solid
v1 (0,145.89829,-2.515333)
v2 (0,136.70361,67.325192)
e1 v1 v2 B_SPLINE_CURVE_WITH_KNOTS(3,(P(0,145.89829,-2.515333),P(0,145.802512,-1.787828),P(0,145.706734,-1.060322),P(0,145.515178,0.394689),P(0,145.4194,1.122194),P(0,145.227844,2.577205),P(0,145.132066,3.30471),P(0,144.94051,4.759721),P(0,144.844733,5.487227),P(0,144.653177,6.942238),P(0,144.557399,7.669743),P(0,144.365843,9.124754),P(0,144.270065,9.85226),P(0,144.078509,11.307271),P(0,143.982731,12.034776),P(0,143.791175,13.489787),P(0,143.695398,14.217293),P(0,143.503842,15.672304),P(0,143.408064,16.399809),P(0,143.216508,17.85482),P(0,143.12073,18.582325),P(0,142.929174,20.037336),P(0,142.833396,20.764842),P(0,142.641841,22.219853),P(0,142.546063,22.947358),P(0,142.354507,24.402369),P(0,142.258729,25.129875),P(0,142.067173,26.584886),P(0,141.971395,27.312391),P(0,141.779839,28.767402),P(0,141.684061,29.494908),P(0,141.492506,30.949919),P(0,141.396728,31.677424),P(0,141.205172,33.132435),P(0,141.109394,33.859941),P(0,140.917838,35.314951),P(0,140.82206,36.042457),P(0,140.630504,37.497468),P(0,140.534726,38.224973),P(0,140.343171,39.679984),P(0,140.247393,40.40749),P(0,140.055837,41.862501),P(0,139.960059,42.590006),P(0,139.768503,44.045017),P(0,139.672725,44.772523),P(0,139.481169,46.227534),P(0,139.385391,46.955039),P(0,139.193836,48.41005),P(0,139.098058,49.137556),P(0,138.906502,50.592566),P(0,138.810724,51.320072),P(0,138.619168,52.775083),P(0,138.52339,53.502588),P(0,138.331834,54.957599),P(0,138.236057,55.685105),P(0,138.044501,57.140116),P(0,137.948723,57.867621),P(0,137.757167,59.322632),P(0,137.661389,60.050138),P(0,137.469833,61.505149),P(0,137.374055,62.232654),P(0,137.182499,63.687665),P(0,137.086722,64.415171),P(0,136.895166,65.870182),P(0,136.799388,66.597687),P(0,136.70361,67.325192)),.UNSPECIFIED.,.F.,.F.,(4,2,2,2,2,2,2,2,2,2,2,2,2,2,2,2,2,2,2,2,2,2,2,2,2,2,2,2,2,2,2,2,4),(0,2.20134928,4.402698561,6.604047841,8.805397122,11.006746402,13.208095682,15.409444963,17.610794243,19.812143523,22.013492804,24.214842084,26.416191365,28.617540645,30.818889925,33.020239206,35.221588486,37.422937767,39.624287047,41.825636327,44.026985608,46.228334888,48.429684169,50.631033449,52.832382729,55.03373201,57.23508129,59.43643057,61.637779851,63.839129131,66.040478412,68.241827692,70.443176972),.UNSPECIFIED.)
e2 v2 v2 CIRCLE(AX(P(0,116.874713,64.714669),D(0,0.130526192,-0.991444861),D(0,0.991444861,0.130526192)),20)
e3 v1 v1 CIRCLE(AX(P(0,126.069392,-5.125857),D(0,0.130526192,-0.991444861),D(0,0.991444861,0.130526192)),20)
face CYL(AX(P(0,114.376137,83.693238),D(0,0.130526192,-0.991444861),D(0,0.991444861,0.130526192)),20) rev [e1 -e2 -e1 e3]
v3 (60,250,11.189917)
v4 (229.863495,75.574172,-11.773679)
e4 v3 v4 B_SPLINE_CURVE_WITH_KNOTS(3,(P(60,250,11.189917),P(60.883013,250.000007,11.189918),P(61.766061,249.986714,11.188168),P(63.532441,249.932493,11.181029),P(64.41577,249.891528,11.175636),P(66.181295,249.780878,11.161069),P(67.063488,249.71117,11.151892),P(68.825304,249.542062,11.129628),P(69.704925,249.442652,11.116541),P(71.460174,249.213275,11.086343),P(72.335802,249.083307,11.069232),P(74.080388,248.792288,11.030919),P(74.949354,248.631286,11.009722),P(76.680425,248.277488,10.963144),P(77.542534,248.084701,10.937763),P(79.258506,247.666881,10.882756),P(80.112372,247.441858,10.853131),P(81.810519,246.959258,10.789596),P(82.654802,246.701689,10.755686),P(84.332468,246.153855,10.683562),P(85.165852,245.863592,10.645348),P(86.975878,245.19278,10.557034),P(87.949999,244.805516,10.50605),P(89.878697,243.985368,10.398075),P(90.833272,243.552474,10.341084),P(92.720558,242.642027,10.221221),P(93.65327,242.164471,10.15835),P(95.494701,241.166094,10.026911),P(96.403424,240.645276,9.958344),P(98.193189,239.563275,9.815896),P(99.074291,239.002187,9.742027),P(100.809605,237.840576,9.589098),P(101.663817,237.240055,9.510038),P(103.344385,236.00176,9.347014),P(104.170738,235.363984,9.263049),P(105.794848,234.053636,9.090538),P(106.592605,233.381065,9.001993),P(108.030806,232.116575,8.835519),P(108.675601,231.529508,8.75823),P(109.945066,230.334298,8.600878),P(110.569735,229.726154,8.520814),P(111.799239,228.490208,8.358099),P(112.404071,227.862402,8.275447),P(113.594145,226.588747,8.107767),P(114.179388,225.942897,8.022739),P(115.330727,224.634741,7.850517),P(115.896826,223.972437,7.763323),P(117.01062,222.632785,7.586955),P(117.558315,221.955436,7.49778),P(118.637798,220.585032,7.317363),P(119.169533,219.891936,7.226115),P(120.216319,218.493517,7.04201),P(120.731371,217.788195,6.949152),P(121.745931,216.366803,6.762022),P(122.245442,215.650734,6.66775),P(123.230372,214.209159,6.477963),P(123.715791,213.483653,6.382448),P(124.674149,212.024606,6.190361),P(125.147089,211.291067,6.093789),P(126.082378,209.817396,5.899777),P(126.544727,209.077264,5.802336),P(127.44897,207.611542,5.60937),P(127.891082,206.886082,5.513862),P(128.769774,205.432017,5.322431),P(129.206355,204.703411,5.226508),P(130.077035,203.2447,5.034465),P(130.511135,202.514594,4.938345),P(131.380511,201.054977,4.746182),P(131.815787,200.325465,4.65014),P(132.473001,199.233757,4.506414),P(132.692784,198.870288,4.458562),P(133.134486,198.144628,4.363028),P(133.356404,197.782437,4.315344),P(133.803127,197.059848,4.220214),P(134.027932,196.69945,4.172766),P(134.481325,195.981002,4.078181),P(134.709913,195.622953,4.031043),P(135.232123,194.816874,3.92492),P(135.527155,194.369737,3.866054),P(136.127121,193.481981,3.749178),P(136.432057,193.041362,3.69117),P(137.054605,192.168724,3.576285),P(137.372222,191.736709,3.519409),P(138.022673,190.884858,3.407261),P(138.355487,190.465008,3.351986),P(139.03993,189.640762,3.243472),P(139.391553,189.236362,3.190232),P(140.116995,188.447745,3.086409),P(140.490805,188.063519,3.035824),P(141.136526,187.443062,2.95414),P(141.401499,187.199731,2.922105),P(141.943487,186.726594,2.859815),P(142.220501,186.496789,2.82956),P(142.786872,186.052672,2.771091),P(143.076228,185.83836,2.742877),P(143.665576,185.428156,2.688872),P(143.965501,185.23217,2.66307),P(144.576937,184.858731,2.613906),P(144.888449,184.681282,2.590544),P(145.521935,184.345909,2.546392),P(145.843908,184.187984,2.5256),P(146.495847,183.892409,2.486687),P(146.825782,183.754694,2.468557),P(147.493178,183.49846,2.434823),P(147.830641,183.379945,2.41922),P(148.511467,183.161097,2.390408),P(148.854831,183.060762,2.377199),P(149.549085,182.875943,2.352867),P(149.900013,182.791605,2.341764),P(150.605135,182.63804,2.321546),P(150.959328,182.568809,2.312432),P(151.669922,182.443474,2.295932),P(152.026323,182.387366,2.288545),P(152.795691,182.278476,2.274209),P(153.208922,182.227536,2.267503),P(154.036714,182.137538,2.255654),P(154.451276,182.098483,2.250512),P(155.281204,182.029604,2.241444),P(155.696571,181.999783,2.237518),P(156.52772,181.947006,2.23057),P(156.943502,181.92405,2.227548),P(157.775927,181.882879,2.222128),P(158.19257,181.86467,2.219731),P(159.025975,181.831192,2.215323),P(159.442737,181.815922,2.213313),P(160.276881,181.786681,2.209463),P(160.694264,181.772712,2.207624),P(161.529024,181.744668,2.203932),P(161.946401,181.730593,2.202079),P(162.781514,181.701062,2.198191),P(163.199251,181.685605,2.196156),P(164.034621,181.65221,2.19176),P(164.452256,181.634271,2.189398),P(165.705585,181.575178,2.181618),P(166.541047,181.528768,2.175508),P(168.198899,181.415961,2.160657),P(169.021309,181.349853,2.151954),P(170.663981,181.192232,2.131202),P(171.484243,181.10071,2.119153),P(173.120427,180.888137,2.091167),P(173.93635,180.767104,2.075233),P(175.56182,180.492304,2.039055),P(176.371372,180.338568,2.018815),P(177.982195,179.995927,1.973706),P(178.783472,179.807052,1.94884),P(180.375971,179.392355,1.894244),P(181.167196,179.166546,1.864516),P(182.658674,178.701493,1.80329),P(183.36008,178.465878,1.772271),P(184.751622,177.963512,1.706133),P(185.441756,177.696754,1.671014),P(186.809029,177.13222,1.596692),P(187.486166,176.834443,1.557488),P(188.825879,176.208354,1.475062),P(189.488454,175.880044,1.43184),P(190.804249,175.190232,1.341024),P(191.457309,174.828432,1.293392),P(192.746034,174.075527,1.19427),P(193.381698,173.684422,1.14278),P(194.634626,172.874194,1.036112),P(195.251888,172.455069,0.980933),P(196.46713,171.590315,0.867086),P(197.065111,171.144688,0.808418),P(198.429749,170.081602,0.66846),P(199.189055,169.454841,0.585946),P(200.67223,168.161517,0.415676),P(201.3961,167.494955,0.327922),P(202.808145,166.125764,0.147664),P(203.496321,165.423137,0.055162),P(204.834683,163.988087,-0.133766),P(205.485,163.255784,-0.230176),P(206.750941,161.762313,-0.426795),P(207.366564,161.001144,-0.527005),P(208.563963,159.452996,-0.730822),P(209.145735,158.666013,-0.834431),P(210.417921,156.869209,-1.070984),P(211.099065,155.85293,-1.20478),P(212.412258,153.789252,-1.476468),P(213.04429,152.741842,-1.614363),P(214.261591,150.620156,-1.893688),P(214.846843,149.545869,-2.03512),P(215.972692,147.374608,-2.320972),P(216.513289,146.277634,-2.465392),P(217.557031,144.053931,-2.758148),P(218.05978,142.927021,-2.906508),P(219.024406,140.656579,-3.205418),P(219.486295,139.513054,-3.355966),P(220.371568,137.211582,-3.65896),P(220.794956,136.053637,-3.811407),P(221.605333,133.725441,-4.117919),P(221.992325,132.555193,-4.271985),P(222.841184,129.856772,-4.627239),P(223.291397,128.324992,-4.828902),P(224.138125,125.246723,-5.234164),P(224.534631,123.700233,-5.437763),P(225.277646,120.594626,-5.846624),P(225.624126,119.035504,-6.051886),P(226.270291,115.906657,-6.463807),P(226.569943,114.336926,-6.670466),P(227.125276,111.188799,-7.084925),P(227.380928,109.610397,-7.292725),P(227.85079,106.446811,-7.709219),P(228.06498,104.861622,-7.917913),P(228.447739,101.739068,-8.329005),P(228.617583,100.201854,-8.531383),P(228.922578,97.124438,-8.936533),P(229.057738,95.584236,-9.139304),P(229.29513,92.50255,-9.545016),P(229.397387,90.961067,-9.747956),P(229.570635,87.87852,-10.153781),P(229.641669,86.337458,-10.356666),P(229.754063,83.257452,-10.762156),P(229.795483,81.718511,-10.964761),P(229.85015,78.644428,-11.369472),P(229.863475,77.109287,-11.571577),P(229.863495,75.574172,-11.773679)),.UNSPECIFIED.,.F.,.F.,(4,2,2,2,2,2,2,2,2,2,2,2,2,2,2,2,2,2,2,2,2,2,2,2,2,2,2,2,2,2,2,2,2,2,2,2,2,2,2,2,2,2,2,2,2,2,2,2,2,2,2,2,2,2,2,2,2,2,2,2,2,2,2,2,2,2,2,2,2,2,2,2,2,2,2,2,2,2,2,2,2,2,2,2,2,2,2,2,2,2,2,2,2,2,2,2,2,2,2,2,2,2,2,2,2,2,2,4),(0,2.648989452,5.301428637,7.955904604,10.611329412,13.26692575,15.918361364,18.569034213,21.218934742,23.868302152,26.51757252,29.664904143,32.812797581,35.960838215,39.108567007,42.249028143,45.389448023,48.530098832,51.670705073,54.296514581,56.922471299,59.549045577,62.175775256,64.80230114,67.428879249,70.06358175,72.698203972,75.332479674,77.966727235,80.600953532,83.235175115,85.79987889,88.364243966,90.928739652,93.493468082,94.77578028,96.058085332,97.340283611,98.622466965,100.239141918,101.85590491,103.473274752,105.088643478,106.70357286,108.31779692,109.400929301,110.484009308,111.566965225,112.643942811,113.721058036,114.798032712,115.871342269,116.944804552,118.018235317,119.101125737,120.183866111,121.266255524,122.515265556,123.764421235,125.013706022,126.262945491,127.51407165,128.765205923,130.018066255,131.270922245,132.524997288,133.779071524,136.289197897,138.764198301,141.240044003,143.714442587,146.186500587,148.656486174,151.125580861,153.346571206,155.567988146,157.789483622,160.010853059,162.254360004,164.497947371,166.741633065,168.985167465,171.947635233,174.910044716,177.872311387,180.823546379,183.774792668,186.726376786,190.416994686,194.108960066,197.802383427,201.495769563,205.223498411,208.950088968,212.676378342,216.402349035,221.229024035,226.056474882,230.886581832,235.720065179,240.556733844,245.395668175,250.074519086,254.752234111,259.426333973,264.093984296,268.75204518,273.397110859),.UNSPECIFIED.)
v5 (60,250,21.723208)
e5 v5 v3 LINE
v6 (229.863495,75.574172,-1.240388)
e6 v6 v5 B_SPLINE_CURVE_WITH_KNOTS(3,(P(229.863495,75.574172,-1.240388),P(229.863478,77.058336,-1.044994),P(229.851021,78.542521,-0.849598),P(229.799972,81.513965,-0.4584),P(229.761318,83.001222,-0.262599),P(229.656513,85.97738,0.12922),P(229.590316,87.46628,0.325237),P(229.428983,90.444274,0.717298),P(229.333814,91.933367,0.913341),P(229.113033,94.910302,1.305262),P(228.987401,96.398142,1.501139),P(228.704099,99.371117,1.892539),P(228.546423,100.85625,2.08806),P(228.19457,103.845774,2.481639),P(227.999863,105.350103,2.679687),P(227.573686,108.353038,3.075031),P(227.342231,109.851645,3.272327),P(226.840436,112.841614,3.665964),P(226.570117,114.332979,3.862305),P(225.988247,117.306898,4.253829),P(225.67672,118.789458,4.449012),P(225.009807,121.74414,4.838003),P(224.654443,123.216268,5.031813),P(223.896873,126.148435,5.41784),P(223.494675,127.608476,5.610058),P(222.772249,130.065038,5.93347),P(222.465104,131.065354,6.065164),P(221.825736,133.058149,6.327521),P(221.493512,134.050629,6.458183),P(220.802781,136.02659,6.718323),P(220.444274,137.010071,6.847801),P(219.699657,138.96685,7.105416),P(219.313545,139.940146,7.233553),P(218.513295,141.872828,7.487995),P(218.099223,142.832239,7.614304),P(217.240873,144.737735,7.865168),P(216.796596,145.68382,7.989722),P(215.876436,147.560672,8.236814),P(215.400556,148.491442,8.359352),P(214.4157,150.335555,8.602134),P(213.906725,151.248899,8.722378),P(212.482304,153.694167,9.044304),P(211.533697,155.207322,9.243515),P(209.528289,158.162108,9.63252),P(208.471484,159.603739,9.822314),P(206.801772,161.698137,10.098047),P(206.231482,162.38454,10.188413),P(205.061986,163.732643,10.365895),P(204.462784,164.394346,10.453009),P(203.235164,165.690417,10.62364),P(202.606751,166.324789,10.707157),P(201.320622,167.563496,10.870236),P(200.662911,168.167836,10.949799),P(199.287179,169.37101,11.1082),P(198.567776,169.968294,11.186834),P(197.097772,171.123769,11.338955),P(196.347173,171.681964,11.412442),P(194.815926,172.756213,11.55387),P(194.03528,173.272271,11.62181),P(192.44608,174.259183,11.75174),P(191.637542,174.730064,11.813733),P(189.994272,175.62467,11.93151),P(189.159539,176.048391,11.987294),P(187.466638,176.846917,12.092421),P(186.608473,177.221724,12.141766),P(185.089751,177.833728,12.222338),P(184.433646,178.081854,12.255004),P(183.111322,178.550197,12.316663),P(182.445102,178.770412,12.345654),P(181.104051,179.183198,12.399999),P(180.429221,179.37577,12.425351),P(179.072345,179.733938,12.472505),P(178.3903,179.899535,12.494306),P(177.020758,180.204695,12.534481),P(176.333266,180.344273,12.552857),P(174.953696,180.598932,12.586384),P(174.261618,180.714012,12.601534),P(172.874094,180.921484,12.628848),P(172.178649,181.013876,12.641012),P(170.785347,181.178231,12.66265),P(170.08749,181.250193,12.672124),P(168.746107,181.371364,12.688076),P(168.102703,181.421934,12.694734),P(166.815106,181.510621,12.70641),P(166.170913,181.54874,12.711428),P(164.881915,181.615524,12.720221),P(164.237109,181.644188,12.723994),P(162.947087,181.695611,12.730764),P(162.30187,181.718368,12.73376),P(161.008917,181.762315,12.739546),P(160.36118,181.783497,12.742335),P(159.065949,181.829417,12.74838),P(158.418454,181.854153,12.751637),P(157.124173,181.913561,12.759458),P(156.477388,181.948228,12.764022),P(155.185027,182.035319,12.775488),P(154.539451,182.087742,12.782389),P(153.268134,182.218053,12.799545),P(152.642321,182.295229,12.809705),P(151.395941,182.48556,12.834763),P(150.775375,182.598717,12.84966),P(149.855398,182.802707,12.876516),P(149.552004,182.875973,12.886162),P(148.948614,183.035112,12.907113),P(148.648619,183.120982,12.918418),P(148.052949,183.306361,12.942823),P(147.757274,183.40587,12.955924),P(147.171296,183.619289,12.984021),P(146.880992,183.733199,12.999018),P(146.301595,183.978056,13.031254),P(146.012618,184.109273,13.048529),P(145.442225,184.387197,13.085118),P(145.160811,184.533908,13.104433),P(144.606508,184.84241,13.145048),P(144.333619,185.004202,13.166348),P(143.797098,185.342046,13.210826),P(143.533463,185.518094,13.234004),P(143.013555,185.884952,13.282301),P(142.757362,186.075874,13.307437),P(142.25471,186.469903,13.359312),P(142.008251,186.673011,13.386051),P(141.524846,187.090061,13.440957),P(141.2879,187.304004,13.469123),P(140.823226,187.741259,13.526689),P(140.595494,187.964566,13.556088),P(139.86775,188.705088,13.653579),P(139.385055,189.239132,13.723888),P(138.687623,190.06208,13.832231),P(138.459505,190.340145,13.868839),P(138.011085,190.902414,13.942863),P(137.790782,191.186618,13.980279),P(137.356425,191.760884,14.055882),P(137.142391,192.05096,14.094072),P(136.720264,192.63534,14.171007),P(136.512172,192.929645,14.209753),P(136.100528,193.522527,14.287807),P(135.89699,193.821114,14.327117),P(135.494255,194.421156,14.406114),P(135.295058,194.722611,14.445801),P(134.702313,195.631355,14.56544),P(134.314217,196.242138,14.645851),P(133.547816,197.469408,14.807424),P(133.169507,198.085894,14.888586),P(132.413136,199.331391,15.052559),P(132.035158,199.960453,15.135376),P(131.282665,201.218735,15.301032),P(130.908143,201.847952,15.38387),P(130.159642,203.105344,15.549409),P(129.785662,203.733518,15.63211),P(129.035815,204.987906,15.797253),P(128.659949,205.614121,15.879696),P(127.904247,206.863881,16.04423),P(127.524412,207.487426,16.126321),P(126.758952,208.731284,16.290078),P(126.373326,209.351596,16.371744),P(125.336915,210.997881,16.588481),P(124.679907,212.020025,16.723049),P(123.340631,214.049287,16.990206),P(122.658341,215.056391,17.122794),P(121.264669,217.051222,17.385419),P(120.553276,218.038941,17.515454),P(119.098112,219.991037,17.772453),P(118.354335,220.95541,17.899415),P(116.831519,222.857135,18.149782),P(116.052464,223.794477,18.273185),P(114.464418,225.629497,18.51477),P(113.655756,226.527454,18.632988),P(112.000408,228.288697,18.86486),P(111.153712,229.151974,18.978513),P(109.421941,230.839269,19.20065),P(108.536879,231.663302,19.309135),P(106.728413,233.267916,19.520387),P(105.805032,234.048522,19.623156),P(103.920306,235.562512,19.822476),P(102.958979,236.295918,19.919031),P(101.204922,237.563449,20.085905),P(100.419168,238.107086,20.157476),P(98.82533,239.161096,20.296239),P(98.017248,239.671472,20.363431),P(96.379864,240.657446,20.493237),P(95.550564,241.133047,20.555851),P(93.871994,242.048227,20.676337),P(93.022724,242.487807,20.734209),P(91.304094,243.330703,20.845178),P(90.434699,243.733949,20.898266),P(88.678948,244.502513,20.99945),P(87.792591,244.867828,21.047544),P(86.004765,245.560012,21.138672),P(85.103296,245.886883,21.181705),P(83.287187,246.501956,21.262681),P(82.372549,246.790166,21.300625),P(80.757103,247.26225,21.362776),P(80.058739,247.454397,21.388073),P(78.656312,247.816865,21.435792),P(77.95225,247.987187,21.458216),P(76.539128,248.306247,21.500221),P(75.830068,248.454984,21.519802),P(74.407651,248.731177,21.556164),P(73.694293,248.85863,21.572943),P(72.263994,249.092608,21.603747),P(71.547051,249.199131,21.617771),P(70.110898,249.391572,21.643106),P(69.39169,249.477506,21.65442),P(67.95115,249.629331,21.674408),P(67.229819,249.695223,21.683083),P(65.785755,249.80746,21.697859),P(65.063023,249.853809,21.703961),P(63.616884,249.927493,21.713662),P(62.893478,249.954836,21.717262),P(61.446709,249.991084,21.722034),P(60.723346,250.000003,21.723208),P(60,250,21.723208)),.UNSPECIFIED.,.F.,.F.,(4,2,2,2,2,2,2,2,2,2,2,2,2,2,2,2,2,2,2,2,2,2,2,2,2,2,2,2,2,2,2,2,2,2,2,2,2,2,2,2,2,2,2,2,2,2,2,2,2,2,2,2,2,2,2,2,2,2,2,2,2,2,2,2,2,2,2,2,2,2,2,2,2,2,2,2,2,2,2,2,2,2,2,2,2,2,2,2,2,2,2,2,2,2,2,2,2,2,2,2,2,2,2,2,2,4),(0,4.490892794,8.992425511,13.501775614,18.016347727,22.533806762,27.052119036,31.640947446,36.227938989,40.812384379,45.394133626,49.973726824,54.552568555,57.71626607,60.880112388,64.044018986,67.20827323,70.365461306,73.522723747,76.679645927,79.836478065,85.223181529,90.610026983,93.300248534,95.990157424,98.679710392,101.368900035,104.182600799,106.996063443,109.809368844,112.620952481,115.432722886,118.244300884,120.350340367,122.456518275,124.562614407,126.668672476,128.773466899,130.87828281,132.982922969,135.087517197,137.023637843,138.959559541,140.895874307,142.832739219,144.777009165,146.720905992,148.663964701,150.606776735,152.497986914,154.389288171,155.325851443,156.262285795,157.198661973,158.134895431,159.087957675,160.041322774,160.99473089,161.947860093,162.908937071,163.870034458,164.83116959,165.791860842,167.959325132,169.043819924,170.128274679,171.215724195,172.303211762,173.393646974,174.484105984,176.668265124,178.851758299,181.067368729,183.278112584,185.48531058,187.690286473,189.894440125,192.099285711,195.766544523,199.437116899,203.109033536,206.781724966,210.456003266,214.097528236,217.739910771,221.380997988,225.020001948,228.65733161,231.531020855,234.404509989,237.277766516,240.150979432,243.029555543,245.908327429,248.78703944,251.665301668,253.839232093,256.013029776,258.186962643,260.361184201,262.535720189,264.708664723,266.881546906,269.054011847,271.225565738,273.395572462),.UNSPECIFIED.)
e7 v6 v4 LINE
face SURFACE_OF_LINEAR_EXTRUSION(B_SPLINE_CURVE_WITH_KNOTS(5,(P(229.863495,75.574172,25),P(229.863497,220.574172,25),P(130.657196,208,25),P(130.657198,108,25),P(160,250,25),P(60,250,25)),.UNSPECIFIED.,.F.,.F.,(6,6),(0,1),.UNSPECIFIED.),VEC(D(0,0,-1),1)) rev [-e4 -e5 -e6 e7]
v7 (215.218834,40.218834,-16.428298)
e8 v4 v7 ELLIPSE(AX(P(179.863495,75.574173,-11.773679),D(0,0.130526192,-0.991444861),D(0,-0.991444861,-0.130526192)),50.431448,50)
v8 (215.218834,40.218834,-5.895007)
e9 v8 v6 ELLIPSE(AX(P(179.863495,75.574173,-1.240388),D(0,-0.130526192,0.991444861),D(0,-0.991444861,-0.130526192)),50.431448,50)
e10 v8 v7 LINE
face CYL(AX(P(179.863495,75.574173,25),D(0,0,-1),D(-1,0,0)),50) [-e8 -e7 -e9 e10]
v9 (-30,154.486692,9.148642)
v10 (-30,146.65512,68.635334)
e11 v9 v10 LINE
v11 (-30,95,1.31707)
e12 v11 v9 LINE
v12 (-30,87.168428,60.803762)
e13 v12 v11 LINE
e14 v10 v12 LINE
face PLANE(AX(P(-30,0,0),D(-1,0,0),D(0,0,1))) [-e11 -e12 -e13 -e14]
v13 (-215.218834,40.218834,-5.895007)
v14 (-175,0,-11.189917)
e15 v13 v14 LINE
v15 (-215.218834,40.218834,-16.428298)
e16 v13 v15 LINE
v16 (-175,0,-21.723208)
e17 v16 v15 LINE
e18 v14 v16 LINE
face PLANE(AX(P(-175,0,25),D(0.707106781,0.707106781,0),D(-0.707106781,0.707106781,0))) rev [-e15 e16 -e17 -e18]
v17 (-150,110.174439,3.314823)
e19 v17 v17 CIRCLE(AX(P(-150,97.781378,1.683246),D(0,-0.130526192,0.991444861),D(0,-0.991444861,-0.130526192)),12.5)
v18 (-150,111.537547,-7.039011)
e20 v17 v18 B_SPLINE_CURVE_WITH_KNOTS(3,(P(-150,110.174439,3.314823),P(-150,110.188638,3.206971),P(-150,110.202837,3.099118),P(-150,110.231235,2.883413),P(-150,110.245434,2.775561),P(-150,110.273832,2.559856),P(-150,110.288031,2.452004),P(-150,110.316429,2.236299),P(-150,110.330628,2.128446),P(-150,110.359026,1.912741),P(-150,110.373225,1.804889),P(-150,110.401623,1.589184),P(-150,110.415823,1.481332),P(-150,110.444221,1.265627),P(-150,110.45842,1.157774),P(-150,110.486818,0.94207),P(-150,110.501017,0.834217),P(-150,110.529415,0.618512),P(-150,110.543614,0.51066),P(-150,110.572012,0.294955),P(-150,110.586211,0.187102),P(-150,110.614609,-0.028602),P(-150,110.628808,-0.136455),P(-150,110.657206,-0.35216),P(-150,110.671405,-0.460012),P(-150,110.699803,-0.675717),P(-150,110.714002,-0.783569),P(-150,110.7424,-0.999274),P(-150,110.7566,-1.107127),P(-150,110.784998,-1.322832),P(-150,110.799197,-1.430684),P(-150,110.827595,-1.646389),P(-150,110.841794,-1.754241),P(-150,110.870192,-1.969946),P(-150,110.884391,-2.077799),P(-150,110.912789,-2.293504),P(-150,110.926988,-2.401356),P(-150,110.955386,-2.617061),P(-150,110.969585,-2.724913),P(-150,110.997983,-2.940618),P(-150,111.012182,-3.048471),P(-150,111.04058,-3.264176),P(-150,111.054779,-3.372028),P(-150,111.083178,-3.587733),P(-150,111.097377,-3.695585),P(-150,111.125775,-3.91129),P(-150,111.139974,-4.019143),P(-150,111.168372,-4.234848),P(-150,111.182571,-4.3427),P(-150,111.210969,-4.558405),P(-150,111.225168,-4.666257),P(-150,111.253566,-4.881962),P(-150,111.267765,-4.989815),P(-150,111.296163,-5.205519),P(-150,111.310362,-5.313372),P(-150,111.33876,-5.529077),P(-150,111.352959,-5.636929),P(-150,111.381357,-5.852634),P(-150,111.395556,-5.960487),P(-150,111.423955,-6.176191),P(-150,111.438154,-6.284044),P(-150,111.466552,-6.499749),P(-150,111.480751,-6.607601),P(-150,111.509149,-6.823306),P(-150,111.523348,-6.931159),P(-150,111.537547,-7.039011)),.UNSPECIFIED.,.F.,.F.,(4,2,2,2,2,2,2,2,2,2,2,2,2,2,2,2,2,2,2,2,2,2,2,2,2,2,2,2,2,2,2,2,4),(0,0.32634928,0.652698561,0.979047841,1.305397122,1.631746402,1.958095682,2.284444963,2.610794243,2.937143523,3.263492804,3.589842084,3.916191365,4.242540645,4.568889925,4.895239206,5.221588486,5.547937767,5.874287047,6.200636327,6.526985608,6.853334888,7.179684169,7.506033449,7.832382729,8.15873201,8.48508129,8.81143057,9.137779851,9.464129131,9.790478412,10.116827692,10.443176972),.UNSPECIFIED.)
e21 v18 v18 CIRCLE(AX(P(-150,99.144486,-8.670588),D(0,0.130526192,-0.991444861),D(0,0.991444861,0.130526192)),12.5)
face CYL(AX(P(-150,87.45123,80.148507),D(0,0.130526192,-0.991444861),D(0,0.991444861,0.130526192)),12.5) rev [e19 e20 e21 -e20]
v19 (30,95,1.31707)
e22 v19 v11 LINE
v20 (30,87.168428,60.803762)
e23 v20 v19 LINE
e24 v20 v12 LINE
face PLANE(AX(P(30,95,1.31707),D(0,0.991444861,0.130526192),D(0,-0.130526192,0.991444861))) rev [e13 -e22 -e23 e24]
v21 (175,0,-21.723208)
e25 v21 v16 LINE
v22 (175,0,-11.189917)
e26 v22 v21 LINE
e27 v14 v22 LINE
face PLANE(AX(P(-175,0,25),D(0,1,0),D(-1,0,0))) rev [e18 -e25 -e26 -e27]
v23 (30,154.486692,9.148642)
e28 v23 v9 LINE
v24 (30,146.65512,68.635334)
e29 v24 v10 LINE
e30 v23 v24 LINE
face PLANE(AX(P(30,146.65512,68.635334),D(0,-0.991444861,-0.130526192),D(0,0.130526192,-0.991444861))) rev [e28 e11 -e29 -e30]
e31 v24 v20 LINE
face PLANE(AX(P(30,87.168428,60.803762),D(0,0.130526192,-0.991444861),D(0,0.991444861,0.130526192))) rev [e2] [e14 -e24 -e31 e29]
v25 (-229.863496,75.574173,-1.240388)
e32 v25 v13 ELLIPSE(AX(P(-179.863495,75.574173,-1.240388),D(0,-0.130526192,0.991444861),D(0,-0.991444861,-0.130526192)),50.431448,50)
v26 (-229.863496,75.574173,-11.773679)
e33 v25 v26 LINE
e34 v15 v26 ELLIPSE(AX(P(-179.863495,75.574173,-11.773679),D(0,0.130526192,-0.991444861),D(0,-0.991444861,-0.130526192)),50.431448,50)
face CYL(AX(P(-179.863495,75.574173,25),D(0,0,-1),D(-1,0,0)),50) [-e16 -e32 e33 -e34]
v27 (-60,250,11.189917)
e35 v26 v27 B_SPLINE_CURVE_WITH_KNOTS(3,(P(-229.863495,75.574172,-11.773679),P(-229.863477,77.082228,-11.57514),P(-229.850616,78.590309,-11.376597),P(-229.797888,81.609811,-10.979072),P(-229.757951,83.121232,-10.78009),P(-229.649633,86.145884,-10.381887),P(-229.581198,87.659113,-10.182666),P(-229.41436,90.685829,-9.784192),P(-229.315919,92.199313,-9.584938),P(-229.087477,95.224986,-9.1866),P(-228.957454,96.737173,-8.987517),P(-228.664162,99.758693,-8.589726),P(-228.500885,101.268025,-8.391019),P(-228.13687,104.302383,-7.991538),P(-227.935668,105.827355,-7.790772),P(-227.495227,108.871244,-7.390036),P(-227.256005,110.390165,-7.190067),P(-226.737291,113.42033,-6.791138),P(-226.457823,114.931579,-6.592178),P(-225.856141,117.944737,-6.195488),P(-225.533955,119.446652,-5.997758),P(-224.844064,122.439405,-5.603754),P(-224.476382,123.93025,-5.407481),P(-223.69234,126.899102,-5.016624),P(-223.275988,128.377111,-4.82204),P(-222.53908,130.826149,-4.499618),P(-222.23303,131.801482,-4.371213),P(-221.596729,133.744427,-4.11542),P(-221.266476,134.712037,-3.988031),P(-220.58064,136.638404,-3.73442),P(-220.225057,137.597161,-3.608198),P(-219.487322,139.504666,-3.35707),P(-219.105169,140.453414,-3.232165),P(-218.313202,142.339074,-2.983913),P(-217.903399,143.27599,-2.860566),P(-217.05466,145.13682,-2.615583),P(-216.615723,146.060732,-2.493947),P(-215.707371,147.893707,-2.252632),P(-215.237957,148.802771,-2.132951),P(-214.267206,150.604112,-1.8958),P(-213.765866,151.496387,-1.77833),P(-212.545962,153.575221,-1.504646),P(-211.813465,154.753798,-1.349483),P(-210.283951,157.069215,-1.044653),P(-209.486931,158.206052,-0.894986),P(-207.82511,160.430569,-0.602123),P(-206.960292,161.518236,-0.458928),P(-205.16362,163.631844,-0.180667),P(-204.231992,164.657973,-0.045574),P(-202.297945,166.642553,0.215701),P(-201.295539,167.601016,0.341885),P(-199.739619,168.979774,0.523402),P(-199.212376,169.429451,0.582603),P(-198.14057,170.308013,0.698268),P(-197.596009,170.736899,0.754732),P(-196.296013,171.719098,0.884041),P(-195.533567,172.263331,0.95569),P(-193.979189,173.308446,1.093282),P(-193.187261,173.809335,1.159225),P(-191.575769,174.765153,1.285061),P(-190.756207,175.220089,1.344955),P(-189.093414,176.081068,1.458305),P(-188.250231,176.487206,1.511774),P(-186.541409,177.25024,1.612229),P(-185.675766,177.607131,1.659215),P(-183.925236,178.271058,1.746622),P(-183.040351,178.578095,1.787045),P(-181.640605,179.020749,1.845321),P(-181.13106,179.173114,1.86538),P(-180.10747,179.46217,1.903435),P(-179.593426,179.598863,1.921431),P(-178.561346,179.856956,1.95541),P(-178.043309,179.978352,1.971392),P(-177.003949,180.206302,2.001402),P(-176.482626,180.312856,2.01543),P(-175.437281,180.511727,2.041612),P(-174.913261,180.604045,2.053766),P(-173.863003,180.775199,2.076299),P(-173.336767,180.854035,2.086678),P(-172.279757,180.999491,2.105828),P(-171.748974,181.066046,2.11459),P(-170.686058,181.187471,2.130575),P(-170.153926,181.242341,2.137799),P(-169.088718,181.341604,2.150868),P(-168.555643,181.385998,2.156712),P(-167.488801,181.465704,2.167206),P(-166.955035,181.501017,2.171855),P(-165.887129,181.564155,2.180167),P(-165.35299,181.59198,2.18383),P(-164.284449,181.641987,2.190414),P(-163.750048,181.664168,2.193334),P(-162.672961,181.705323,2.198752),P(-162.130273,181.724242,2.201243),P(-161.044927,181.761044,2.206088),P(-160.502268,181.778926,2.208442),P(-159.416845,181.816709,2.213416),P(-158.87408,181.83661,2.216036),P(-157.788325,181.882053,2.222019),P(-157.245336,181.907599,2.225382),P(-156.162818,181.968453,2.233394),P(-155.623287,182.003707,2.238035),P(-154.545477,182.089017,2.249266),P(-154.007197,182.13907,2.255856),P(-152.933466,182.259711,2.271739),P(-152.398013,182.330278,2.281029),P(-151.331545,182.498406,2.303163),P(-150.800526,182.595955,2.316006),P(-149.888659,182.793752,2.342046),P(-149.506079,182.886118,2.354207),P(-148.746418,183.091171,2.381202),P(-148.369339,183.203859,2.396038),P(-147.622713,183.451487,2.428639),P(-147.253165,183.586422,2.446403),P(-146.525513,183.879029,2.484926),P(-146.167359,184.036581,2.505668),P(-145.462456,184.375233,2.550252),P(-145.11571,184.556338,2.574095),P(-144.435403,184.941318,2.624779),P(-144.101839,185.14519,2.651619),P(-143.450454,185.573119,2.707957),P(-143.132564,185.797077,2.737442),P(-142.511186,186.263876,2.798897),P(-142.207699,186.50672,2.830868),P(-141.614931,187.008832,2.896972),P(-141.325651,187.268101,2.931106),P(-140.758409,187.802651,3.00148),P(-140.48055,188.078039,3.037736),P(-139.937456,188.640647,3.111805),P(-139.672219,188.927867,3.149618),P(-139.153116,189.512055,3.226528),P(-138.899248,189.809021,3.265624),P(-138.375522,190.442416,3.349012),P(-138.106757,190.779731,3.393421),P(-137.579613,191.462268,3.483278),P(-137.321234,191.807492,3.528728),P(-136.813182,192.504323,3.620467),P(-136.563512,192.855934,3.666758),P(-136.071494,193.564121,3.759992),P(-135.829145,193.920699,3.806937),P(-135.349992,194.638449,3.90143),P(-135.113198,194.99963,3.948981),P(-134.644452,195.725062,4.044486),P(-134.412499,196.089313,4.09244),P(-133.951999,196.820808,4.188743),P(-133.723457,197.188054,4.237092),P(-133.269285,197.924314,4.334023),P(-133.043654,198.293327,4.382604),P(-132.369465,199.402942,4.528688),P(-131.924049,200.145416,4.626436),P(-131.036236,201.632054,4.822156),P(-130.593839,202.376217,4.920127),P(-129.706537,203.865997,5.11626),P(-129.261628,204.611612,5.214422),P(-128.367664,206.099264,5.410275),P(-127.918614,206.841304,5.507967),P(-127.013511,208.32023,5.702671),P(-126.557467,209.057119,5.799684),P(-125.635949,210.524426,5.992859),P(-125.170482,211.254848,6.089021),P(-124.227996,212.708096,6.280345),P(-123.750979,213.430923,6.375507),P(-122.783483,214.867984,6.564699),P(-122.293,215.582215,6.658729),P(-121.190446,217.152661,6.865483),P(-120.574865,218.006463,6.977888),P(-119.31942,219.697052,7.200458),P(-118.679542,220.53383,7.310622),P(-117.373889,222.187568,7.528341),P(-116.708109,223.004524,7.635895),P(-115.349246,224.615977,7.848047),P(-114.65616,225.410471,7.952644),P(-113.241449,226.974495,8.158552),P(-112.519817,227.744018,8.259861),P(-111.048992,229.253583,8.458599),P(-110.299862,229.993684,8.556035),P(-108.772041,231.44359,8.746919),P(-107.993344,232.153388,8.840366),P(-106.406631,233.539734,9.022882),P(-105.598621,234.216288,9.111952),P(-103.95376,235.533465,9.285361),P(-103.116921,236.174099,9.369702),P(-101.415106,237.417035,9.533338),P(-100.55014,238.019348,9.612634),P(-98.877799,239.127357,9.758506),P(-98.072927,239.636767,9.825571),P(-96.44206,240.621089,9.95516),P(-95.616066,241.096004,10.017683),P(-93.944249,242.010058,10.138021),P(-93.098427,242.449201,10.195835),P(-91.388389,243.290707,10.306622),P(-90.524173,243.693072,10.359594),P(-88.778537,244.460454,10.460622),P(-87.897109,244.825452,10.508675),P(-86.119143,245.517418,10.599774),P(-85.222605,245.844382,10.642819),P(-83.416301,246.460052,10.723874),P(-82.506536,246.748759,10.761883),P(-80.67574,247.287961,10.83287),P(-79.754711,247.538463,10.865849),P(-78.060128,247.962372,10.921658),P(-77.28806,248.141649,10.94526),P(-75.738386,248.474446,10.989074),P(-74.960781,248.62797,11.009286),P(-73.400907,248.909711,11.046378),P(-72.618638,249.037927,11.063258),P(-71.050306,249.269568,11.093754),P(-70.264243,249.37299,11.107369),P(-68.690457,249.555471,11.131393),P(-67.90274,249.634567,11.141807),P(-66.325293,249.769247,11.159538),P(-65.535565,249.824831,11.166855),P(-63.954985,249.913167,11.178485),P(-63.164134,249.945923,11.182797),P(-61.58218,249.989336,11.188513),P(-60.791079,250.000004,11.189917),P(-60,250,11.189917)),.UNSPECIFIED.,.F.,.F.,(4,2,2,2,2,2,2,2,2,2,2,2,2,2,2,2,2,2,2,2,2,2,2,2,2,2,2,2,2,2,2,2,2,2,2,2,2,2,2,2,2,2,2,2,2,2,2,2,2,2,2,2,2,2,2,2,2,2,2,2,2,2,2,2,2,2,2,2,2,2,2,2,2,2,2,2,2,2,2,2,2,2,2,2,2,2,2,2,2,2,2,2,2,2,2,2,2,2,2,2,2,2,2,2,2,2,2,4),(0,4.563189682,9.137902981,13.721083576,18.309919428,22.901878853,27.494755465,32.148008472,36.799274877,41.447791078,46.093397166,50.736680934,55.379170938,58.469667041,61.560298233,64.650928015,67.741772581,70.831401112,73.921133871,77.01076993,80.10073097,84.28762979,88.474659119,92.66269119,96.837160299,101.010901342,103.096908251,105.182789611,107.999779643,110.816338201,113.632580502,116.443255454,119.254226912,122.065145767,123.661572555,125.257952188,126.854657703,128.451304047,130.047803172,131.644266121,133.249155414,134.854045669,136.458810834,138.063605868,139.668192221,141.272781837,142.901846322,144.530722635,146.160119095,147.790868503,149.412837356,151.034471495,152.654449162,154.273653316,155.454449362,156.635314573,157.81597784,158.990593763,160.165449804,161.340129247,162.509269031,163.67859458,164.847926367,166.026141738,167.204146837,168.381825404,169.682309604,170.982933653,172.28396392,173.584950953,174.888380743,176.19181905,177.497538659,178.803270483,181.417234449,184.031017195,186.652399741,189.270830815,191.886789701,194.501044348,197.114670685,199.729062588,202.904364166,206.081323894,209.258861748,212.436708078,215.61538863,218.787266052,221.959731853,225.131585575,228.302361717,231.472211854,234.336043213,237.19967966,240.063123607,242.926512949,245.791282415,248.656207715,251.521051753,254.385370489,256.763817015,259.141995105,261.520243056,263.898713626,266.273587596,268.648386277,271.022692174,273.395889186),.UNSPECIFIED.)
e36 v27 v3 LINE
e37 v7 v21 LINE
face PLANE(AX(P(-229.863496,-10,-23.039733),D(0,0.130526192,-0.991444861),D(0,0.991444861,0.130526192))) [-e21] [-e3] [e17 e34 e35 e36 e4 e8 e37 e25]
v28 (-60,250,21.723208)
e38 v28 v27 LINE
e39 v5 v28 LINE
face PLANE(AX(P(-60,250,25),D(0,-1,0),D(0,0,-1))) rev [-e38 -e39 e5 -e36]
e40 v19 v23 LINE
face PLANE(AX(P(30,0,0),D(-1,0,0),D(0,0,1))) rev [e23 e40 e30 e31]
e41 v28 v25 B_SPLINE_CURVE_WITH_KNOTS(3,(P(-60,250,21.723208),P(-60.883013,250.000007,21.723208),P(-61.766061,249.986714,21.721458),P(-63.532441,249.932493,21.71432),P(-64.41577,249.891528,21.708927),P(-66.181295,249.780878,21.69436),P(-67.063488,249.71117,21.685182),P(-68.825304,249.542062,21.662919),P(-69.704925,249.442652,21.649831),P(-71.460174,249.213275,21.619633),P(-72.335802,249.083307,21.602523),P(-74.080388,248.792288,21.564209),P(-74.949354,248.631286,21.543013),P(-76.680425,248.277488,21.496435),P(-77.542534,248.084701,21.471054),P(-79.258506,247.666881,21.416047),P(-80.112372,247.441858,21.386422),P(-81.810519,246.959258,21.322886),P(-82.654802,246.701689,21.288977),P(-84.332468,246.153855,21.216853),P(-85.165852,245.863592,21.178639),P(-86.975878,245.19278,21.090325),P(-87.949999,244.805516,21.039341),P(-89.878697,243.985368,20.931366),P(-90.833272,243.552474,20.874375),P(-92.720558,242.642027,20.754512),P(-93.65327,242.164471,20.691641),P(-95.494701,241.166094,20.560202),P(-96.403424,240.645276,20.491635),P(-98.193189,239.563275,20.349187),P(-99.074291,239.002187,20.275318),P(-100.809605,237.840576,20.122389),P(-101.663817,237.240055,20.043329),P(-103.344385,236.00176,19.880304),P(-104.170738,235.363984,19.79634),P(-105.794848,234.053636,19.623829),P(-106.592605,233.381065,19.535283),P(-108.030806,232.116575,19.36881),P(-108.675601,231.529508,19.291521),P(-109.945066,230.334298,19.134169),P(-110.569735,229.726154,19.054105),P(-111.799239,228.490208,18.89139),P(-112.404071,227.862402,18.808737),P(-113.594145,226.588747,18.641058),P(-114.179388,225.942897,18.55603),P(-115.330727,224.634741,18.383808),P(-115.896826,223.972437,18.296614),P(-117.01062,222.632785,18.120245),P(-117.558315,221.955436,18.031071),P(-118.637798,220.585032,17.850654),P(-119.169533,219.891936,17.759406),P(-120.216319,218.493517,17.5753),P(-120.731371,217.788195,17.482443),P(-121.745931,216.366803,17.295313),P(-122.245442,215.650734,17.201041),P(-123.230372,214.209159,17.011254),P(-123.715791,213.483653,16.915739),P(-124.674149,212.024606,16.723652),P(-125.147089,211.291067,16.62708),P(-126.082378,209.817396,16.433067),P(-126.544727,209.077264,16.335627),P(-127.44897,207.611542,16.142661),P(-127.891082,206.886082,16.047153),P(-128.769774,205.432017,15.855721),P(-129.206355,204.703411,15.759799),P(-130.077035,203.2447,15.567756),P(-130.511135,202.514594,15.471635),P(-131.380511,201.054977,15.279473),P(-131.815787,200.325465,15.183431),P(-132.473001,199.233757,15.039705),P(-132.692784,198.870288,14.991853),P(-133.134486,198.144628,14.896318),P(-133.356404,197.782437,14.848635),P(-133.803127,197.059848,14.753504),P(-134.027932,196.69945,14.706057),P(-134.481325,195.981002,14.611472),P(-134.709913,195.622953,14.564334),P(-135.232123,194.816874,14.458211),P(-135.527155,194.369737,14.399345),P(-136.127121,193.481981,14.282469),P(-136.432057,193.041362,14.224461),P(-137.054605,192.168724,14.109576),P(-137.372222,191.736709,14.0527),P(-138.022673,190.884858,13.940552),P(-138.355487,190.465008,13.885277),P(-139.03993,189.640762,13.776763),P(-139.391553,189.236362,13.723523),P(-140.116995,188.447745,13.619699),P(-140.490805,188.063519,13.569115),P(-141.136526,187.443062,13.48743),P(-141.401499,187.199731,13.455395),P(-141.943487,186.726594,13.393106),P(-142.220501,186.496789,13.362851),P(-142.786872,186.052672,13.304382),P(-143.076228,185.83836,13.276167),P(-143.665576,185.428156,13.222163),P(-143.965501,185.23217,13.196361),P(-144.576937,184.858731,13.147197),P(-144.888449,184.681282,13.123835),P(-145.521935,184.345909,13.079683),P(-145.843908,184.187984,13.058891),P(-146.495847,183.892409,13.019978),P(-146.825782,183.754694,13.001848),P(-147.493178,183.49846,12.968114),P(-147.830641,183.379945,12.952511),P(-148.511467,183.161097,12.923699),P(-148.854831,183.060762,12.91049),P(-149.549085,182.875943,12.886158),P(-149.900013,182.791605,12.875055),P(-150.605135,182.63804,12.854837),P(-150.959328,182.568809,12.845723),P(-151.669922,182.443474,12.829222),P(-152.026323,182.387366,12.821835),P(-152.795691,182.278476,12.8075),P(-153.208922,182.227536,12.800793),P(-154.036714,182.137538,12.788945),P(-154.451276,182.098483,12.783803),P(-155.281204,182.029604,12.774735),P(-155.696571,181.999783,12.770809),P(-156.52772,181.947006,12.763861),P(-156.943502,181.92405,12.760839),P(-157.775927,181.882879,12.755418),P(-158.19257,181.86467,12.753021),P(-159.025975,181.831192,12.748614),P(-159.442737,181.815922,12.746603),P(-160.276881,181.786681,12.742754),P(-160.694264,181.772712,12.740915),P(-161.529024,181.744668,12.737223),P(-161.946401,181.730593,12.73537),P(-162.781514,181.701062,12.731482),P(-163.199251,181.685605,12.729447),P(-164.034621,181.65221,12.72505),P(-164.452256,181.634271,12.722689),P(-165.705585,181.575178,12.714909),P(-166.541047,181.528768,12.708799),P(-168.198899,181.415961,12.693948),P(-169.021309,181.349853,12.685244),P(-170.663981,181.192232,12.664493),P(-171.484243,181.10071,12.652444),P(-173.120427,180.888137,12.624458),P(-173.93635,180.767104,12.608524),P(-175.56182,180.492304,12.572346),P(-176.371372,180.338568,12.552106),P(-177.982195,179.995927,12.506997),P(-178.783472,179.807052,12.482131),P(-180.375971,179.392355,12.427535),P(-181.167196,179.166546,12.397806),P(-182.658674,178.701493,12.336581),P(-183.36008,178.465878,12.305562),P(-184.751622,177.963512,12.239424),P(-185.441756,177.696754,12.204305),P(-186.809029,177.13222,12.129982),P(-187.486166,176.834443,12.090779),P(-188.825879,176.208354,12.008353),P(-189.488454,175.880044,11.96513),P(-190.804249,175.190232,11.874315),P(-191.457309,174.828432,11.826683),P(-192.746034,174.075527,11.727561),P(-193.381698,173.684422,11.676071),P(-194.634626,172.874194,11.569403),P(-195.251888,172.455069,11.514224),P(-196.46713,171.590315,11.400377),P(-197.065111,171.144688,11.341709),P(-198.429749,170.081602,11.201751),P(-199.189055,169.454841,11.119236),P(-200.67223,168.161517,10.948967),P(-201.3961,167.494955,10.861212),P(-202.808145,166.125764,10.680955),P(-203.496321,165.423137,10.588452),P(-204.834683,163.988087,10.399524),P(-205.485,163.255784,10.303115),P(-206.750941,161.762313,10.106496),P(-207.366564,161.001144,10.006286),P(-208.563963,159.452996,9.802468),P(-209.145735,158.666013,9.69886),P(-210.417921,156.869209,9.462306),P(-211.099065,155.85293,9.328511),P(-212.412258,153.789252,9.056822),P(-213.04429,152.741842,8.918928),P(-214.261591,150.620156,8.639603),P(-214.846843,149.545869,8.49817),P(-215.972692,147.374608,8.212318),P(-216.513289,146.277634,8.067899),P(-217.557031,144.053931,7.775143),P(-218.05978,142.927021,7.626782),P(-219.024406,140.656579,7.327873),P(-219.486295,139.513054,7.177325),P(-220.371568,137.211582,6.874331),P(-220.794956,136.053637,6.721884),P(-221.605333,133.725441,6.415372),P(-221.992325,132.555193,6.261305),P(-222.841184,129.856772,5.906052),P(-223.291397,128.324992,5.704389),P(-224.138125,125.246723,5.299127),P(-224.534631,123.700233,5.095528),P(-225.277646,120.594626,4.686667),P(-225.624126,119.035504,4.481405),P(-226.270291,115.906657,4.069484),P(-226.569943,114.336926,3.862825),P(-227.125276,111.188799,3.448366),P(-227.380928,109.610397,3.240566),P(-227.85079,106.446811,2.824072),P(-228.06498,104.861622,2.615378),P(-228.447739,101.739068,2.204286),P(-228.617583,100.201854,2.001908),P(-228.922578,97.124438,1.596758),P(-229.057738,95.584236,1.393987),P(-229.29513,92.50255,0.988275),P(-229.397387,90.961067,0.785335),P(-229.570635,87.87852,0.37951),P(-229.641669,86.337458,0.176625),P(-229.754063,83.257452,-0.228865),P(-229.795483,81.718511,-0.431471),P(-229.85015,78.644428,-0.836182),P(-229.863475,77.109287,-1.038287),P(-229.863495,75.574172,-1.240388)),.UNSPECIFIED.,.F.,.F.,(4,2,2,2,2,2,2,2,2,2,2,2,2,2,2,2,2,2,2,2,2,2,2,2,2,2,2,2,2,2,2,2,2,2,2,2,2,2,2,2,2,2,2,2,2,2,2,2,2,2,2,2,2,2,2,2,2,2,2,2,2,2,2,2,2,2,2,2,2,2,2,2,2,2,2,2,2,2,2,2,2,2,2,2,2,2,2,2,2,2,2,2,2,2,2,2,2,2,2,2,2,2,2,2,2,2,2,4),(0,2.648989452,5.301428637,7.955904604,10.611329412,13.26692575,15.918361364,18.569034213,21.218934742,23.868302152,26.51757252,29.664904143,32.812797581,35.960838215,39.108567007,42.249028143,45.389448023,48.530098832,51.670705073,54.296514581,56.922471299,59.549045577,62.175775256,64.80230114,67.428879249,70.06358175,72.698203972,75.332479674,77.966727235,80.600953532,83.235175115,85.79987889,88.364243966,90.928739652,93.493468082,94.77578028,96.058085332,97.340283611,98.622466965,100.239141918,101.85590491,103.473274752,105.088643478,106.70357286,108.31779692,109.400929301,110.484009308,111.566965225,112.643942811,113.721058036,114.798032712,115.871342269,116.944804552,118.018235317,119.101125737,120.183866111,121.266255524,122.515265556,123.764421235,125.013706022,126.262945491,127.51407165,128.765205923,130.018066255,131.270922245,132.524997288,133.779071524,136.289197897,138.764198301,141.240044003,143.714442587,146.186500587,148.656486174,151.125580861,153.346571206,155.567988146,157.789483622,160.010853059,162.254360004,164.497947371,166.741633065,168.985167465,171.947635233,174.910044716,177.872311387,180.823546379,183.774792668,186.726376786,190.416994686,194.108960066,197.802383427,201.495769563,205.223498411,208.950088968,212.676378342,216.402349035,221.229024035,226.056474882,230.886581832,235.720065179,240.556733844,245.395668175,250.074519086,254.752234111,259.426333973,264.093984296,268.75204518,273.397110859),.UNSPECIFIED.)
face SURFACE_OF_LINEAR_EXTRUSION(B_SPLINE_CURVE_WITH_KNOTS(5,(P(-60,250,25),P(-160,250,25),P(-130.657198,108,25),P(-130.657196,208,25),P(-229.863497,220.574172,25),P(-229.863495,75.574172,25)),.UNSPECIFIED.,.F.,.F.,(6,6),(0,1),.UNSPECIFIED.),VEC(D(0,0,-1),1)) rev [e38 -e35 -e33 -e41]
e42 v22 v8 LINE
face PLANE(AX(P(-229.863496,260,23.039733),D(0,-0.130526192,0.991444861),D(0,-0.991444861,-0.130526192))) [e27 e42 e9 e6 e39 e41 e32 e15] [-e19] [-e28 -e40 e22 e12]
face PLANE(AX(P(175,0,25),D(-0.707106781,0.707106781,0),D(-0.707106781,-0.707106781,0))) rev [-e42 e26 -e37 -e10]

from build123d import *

# Parameters (mm, degrees)
BOSS_EXTRUDE1_START     = -25
BOSS_EXTRUDE1_DEPTH     = 50
CUT_EXTRUDE1_DEPTH      = 341.53226913
CUT_EXTRUDE1_DEPTH_BACK = 341.53226913
BOSS_EXTRUDE3_DEPTH     = 30
CUT_EXTRUDE2_DEPTH      = 350.338594582
CUT_EXTRUDE2_DEPTH_BACK = 350.338594582
SKETCH4_R               = 20
CUT_EXTRUDE3_DEPTH      = 350.338594582
CUT_EXTRUDE3_DEPTH_BACK = 350.338594582
SKETCH6_R               = 12.5


# Read off the part's stored shape, not the designer's step: Boss-Extrude1
with BuildPart() as part:
    # Boss-Extrude1 outline → Boss-Extrude1 (new body)
    with BuildSketch(Plane.XY.offset(BOSS_EXTRUDE1_START)):
        with BuildLine():
            Line((175, 0), (215.218833807, 40.218833807))
            ThreePointArc((215.218833807, 40.218833807), (226.057471223, 56.440000887), (229.863494748, 75.574172084))
            add(Edge.make_bspline(
                [(229.863494748, 75.574172084), (229.863497015, 220.574172084), (130.657195822, 208), (130.657198498, 108), (160, 250), (60, 250)],
                knots=[0, 0, 0, 0, 0, 0, 1, 1, 1, 1, 1, 1], degree=5))
            Line((60, 250), (-60, 250))
            add(Edge.make_bspline(
                [(-60, 250), (-160, 250), (-130.657198498, 108), (-130.657195822, 208), (-229.863497015, 220.574172084), (-229.863494748, 75.574172084)],
                knots=[0, 0, 0, 0, 0, 0, 1, 1, 1, 1, 1, 1], degree=5))
            ThreePointArc((-229.863494748, 75.574172084), (-226.057471223, 56.440000887), (-215.218833807, 40.218833807))
            Line((-215.218833807, 40.218833807), (-175, 0))
            Line((-175, 0), (175, 0))
        make_face()
    extrude(amount=BOSS_EXTRUDE1_DEPTH)

    # Sketch2 → Cut-Extrude1 (cut, two sides: drawn at the far end of the back side and taken through both)
    with BuildSketch(Plane(origin=(0, 0, 0), x_dir=(0, 0, -1), z_dir=(1, 0, 0)).offset(-CUT_EXTRUDE1_DEPTH_BACK)):
        Polygon((23.039732542, -10), (-12.506441807, 260), (35, 260), (35, -10), align=None)
        Polygon((-23.039732542, 260), (12.506441807, -10), (-35, -10), (-35, 260), align=None)
    extrude(amount=CUT_EXTRUDE1_DEPTH + CUT_EXTRUDE1_DEPTH_BACK, mode=Mode.SUBTRACT)

    # Sketch11 → Boss-Extrude3 (add, symmetric)
    with BuildSketch(Plane(origin=(0, 0, 0), x_dir=(0, 0, -1), z_dir=(1, 0, 0))):
        Polygon((-9.148641973, 154.486691682), (-1.31707044, 95), (-60.803762122, 87.168428467), (-68.635333655, 146.655120149), align=None)
    extrude(amount=BOSS_EXTRUDE3_DEPTH, both=True)

    # Sketch4 → Cut-Extrude2 (cut, two sides: drawn at the far end of the back side and taken through both)
    with BuildSketch(Plane(origin=(0, 2.811189919, -21.353107392), x_dir=(-1, 0, 0), z_dir=(0, 0.13052619222005532, -0.99144486137381)).offset(-CUT_EXTRUDE2_DEPTH_BACK)):
        with Locations(Location((0, 124.321792579, 0), (0, 0, 90))):
            Circle(SKETCH4_R)
    extrude(amount=CUT_EXTRUDE2_DEPTH + CUT_EXTRUDE2_DEPTH_BACK, mode=Mode.SUBTRACT)

    # Sketch6 → Cut-Extrude3 (cut, two sides: drawn at the far end of the back side and taken through both)
    with BuildSketch(Plane(origin=(0, 2.811189919, -21.353107392), x_dir=(-1, 0, 0), z_dir=(0, 0.13052619222005532, -0.99144486137381)).offset(-CUT_EXTRUDE3_DEPTH_BACK)):
        with Locations(Location((150, 97.164552434, 0), (0, 0, 90))):
            Circle(SKETCH6_R)
    extrude(amount=CUT_EXTRUDE3_DEPTH + CUT_EXTRUDE3_DEPTH_BACK, mode=Mode.SUBTRACT)


solid = part.part
